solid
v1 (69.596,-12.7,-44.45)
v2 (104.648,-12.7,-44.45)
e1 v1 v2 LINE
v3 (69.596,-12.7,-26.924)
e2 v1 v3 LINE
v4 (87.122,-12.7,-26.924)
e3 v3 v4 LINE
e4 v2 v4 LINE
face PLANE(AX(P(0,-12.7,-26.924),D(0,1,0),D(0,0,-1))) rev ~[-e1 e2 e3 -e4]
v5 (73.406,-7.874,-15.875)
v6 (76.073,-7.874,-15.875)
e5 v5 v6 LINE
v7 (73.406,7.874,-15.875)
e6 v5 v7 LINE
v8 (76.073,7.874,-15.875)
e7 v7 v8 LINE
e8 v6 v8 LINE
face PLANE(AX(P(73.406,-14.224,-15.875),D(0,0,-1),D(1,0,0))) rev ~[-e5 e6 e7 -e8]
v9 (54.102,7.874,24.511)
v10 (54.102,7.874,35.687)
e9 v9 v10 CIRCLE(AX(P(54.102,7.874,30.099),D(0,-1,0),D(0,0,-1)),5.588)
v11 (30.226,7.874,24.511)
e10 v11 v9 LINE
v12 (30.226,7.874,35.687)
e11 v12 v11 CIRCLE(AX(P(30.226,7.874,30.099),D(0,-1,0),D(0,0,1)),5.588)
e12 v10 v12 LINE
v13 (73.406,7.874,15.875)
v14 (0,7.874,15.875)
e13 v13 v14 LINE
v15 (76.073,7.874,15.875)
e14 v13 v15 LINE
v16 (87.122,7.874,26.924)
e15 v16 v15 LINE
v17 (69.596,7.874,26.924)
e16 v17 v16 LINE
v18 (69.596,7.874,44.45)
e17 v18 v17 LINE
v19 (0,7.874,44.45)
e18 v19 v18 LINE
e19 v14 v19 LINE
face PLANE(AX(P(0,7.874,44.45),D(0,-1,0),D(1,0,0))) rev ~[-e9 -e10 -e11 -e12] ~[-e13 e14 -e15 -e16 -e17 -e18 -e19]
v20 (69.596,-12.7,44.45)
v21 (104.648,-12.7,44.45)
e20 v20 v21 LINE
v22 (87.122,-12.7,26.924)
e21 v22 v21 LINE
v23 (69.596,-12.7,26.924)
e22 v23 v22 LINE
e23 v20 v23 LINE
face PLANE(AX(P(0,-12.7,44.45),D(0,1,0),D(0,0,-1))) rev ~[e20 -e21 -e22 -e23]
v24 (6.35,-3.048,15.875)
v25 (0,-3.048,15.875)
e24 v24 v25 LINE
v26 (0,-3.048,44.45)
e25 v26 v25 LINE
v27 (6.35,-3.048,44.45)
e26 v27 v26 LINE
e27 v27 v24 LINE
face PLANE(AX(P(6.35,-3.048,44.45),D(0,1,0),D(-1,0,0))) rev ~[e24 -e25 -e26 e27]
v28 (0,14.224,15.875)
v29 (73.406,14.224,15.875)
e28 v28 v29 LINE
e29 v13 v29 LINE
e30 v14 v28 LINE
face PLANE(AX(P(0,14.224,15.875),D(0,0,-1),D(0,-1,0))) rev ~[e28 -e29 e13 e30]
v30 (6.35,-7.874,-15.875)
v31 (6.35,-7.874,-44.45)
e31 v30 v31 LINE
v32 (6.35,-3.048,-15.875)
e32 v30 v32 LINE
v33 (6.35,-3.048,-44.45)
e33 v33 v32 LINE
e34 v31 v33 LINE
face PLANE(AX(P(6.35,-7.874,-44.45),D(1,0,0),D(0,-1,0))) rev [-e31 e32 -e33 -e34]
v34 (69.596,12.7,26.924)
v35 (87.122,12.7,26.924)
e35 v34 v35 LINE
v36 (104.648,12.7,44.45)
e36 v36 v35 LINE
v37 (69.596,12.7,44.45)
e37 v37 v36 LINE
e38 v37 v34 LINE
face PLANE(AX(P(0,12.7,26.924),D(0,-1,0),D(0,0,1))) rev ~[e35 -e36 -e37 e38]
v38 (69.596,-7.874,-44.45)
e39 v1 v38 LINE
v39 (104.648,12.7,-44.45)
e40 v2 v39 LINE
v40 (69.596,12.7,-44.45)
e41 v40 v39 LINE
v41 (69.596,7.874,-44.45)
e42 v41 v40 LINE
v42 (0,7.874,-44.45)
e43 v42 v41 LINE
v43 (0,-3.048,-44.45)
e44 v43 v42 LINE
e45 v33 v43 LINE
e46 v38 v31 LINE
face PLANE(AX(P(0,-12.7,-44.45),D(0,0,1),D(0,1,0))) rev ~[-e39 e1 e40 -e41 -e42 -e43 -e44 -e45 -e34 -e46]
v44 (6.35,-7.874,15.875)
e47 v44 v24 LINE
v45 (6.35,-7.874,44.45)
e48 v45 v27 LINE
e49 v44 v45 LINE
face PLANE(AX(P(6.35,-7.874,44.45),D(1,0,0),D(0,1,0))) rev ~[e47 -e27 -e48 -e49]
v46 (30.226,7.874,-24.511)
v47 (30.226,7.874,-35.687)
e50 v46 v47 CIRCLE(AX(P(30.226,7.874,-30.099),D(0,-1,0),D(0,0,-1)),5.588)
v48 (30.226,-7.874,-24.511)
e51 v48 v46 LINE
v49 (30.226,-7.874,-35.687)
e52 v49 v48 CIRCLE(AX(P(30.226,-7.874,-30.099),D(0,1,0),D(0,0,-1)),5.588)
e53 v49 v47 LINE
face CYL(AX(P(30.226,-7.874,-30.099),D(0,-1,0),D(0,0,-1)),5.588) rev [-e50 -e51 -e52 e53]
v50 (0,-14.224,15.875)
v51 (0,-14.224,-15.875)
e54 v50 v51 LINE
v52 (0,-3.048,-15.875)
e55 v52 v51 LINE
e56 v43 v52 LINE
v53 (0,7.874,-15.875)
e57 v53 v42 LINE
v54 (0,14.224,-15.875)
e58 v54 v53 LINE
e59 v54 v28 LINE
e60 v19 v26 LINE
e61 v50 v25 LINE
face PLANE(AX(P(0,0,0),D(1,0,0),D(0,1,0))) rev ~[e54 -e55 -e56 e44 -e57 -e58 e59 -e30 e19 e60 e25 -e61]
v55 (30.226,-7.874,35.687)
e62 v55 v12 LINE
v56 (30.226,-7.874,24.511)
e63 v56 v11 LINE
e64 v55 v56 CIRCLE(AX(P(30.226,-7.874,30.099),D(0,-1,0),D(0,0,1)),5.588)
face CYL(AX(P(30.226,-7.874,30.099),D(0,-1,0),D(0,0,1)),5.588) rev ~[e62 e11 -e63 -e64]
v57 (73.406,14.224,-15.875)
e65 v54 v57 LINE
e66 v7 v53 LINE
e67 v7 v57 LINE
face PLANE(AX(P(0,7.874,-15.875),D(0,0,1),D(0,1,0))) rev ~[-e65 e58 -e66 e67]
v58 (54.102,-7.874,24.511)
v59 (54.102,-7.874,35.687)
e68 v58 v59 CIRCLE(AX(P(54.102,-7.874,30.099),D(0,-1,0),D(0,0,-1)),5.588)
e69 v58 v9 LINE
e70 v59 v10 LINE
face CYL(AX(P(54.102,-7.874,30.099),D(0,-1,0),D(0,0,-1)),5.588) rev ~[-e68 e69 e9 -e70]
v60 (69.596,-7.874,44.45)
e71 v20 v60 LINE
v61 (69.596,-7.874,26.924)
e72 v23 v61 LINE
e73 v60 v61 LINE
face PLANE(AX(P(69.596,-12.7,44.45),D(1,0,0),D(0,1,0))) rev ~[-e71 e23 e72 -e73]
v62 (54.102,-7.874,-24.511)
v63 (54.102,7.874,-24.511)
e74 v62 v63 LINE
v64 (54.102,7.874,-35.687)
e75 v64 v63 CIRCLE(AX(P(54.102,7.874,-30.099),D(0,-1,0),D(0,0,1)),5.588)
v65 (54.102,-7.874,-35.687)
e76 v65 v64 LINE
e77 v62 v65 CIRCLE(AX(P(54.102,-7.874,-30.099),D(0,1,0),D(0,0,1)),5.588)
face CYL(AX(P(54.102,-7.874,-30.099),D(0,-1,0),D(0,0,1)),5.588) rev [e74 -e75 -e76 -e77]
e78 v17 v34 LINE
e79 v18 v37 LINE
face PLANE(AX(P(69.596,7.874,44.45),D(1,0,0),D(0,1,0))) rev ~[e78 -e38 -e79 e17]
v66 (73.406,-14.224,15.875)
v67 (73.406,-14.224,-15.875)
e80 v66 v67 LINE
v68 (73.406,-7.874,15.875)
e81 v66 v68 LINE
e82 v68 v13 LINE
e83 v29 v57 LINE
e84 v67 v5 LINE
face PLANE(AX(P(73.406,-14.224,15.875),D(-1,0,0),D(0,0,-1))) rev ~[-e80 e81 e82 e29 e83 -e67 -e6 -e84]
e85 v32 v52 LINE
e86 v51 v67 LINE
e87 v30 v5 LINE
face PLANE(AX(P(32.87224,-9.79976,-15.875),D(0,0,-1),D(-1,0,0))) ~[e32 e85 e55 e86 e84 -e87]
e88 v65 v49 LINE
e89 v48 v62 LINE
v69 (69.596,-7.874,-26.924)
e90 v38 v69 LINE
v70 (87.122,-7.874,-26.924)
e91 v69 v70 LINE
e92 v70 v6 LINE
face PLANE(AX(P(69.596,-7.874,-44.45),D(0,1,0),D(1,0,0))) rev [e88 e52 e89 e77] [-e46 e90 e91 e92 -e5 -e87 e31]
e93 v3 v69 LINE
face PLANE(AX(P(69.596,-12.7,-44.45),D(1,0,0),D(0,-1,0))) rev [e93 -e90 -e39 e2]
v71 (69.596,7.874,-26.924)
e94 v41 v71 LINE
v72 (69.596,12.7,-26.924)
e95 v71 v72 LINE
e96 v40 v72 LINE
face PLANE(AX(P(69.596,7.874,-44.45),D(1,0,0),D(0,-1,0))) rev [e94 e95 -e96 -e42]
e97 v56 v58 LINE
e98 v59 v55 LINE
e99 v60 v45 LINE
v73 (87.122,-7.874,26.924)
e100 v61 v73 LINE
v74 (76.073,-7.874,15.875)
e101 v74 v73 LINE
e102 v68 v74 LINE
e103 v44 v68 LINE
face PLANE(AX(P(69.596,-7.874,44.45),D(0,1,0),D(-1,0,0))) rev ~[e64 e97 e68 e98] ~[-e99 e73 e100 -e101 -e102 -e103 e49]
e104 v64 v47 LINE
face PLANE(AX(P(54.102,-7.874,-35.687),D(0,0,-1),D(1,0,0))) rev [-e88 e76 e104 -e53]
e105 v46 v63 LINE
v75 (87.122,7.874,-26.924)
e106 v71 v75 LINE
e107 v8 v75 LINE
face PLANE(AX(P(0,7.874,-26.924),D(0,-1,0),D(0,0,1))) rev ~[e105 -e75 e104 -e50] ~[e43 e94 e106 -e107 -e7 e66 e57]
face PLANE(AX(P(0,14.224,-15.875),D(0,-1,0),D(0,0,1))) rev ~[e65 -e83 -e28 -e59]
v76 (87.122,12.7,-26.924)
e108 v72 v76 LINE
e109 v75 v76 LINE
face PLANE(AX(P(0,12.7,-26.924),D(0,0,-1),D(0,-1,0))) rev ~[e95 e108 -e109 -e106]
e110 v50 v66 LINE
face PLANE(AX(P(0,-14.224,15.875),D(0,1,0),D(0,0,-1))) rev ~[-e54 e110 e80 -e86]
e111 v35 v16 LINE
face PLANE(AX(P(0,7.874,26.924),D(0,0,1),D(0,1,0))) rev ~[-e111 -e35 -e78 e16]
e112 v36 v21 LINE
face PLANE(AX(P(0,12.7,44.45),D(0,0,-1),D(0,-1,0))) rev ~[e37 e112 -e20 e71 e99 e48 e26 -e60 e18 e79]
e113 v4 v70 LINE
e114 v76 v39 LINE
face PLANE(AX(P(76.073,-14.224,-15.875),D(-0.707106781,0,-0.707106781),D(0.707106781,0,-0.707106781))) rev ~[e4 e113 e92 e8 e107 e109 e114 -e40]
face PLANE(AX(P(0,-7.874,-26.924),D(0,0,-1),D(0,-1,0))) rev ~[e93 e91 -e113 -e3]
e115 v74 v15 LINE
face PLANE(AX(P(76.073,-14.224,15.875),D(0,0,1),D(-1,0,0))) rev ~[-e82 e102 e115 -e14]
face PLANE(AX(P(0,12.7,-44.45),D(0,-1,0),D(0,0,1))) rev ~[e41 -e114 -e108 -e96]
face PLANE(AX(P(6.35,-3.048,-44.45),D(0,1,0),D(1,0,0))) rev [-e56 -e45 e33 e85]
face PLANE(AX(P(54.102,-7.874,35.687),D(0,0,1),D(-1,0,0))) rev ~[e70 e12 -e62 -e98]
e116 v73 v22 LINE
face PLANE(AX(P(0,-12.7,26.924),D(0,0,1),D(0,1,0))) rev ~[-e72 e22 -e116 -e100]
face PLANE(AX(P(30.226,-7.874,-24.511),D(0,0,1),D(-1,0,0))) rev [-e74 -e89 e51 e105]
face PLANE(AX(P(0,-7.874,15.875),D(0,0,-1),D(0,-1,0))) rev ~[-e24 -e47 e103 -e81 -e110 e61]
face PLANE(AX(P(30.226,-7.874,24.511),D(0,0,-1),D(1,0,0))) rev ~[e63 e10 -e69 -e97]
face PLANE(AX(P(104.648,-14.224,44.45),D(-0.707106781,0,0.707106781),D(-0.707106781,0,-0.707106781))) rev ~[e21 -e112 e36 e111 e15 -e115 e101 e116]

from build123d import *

# Parameters (mm, degrees)
F1_DEPTH = 104.648
F3_DEPTH = 28.449
F5_W     = 69.596
F5_H     = 4.826
F6_DEPTH = 28.575
F8_DEPTH = 22.099


# Not quite as in the source:
# - a pattern or mirror of a feature is missing from the dataset's text; its kind, count and spacing are read off the source's solid


with BuildPart() as f1:
    # F0 (on Right) → F1 (new body)
    with BuildSketch(Plane.YZ):
        Polygon((12.7, 44.45), (0, 44.45), (-12.7, 44.45), (-12.7, 26.924), (-7.874, 26.924), (-7.874, 15.875), (-14.224, 15.875), (-14.224, 0), (-14.224, -15.875), (-7.874, -15.875), (-7.874, -26.924), (-12.7, -26.924), (-12.7, -44.45), (0, -44.45), (12.7, -44.45), (12.7, -26.924), (7.874, -26.924), (7.874, -15.875), (14.224, -15.875), (14.224, 0), (14.224, 15.875), (7.874, 15.875), (7.874, 26.924), (12.7, 26.924), align=None)
    extrude(amount=F1_DEPTH)

    # F2 (on face) → F3 (cut, through all)
    with BuildSketch(Plane.XZ.offset(14.224)):
        Polygon((73.406, 15.875), (73.406, 0), (73.406, -15.875), (76.073, -15.875), (104.648, -44.45), (104.648, -15.875), (104.648, 0), (104.648, 15.875), (104.648, 44.45), (76.073, 15.875), align=None)
    extrude(amount=-F3_DEPTH, mode=Mode.SUBTRACT)

    # F5 (on face) → F6 (cut)
    with BuildSketch(Plane.XY.offset(44.45)):
        with Locations((34.798, 10.287)):
            Rectangle(F5_W, F5_H)
        Polygon((0, -3.048), (0, -12.7), (69.596, -12.7), (69.596, -7.874), (6.35, -7.874), (6.35, -3.048), align=None)
    f6 = extrude(amount=-F6_DEPTH, mode=Mode.SUBTRACT)

    # F6_copies: F6 across plane
    add(f6.mirror(Plane(origin=(0, 0, 0), x_dir=(-1, 0, 0), z_dir=(0, 0, -1))), mode=Mode.SUBTRACT)

    # F7 (on face) → F8 (cut, through all)
    with BuildSketch(Plane.XZ.offset(7.874)):
        with BuildLine():
            Line((42.164, 35.687), (30.226, 35.687))
            ThreePointArc((30.226, 35.687), (24.638, 30.099), (30.226, 24.511))
            Line((30.226, 24.511), (42.164, 24.511))
            Line((42.164, 24.511), (54.102, 24.511))
            ThreePointArc((54.102, 24.511), (59.69, 30.099), (54.102, 35.687))
            Line((54.102, 35.687), (42.164, 35.687))
        make_face()
    f8 = extrude(amount=-F8_DEPTH, mode=Mode.SUBTRACT)

    # F8_copies: F8 across plane
    add(f8.mirror(Plane(origin=(0, 0, 0), x_dir=(-1, 0, 0), z_dir=(0, 0, -1))), mode=Mode.SUBTRACT)


solid = f1.part
